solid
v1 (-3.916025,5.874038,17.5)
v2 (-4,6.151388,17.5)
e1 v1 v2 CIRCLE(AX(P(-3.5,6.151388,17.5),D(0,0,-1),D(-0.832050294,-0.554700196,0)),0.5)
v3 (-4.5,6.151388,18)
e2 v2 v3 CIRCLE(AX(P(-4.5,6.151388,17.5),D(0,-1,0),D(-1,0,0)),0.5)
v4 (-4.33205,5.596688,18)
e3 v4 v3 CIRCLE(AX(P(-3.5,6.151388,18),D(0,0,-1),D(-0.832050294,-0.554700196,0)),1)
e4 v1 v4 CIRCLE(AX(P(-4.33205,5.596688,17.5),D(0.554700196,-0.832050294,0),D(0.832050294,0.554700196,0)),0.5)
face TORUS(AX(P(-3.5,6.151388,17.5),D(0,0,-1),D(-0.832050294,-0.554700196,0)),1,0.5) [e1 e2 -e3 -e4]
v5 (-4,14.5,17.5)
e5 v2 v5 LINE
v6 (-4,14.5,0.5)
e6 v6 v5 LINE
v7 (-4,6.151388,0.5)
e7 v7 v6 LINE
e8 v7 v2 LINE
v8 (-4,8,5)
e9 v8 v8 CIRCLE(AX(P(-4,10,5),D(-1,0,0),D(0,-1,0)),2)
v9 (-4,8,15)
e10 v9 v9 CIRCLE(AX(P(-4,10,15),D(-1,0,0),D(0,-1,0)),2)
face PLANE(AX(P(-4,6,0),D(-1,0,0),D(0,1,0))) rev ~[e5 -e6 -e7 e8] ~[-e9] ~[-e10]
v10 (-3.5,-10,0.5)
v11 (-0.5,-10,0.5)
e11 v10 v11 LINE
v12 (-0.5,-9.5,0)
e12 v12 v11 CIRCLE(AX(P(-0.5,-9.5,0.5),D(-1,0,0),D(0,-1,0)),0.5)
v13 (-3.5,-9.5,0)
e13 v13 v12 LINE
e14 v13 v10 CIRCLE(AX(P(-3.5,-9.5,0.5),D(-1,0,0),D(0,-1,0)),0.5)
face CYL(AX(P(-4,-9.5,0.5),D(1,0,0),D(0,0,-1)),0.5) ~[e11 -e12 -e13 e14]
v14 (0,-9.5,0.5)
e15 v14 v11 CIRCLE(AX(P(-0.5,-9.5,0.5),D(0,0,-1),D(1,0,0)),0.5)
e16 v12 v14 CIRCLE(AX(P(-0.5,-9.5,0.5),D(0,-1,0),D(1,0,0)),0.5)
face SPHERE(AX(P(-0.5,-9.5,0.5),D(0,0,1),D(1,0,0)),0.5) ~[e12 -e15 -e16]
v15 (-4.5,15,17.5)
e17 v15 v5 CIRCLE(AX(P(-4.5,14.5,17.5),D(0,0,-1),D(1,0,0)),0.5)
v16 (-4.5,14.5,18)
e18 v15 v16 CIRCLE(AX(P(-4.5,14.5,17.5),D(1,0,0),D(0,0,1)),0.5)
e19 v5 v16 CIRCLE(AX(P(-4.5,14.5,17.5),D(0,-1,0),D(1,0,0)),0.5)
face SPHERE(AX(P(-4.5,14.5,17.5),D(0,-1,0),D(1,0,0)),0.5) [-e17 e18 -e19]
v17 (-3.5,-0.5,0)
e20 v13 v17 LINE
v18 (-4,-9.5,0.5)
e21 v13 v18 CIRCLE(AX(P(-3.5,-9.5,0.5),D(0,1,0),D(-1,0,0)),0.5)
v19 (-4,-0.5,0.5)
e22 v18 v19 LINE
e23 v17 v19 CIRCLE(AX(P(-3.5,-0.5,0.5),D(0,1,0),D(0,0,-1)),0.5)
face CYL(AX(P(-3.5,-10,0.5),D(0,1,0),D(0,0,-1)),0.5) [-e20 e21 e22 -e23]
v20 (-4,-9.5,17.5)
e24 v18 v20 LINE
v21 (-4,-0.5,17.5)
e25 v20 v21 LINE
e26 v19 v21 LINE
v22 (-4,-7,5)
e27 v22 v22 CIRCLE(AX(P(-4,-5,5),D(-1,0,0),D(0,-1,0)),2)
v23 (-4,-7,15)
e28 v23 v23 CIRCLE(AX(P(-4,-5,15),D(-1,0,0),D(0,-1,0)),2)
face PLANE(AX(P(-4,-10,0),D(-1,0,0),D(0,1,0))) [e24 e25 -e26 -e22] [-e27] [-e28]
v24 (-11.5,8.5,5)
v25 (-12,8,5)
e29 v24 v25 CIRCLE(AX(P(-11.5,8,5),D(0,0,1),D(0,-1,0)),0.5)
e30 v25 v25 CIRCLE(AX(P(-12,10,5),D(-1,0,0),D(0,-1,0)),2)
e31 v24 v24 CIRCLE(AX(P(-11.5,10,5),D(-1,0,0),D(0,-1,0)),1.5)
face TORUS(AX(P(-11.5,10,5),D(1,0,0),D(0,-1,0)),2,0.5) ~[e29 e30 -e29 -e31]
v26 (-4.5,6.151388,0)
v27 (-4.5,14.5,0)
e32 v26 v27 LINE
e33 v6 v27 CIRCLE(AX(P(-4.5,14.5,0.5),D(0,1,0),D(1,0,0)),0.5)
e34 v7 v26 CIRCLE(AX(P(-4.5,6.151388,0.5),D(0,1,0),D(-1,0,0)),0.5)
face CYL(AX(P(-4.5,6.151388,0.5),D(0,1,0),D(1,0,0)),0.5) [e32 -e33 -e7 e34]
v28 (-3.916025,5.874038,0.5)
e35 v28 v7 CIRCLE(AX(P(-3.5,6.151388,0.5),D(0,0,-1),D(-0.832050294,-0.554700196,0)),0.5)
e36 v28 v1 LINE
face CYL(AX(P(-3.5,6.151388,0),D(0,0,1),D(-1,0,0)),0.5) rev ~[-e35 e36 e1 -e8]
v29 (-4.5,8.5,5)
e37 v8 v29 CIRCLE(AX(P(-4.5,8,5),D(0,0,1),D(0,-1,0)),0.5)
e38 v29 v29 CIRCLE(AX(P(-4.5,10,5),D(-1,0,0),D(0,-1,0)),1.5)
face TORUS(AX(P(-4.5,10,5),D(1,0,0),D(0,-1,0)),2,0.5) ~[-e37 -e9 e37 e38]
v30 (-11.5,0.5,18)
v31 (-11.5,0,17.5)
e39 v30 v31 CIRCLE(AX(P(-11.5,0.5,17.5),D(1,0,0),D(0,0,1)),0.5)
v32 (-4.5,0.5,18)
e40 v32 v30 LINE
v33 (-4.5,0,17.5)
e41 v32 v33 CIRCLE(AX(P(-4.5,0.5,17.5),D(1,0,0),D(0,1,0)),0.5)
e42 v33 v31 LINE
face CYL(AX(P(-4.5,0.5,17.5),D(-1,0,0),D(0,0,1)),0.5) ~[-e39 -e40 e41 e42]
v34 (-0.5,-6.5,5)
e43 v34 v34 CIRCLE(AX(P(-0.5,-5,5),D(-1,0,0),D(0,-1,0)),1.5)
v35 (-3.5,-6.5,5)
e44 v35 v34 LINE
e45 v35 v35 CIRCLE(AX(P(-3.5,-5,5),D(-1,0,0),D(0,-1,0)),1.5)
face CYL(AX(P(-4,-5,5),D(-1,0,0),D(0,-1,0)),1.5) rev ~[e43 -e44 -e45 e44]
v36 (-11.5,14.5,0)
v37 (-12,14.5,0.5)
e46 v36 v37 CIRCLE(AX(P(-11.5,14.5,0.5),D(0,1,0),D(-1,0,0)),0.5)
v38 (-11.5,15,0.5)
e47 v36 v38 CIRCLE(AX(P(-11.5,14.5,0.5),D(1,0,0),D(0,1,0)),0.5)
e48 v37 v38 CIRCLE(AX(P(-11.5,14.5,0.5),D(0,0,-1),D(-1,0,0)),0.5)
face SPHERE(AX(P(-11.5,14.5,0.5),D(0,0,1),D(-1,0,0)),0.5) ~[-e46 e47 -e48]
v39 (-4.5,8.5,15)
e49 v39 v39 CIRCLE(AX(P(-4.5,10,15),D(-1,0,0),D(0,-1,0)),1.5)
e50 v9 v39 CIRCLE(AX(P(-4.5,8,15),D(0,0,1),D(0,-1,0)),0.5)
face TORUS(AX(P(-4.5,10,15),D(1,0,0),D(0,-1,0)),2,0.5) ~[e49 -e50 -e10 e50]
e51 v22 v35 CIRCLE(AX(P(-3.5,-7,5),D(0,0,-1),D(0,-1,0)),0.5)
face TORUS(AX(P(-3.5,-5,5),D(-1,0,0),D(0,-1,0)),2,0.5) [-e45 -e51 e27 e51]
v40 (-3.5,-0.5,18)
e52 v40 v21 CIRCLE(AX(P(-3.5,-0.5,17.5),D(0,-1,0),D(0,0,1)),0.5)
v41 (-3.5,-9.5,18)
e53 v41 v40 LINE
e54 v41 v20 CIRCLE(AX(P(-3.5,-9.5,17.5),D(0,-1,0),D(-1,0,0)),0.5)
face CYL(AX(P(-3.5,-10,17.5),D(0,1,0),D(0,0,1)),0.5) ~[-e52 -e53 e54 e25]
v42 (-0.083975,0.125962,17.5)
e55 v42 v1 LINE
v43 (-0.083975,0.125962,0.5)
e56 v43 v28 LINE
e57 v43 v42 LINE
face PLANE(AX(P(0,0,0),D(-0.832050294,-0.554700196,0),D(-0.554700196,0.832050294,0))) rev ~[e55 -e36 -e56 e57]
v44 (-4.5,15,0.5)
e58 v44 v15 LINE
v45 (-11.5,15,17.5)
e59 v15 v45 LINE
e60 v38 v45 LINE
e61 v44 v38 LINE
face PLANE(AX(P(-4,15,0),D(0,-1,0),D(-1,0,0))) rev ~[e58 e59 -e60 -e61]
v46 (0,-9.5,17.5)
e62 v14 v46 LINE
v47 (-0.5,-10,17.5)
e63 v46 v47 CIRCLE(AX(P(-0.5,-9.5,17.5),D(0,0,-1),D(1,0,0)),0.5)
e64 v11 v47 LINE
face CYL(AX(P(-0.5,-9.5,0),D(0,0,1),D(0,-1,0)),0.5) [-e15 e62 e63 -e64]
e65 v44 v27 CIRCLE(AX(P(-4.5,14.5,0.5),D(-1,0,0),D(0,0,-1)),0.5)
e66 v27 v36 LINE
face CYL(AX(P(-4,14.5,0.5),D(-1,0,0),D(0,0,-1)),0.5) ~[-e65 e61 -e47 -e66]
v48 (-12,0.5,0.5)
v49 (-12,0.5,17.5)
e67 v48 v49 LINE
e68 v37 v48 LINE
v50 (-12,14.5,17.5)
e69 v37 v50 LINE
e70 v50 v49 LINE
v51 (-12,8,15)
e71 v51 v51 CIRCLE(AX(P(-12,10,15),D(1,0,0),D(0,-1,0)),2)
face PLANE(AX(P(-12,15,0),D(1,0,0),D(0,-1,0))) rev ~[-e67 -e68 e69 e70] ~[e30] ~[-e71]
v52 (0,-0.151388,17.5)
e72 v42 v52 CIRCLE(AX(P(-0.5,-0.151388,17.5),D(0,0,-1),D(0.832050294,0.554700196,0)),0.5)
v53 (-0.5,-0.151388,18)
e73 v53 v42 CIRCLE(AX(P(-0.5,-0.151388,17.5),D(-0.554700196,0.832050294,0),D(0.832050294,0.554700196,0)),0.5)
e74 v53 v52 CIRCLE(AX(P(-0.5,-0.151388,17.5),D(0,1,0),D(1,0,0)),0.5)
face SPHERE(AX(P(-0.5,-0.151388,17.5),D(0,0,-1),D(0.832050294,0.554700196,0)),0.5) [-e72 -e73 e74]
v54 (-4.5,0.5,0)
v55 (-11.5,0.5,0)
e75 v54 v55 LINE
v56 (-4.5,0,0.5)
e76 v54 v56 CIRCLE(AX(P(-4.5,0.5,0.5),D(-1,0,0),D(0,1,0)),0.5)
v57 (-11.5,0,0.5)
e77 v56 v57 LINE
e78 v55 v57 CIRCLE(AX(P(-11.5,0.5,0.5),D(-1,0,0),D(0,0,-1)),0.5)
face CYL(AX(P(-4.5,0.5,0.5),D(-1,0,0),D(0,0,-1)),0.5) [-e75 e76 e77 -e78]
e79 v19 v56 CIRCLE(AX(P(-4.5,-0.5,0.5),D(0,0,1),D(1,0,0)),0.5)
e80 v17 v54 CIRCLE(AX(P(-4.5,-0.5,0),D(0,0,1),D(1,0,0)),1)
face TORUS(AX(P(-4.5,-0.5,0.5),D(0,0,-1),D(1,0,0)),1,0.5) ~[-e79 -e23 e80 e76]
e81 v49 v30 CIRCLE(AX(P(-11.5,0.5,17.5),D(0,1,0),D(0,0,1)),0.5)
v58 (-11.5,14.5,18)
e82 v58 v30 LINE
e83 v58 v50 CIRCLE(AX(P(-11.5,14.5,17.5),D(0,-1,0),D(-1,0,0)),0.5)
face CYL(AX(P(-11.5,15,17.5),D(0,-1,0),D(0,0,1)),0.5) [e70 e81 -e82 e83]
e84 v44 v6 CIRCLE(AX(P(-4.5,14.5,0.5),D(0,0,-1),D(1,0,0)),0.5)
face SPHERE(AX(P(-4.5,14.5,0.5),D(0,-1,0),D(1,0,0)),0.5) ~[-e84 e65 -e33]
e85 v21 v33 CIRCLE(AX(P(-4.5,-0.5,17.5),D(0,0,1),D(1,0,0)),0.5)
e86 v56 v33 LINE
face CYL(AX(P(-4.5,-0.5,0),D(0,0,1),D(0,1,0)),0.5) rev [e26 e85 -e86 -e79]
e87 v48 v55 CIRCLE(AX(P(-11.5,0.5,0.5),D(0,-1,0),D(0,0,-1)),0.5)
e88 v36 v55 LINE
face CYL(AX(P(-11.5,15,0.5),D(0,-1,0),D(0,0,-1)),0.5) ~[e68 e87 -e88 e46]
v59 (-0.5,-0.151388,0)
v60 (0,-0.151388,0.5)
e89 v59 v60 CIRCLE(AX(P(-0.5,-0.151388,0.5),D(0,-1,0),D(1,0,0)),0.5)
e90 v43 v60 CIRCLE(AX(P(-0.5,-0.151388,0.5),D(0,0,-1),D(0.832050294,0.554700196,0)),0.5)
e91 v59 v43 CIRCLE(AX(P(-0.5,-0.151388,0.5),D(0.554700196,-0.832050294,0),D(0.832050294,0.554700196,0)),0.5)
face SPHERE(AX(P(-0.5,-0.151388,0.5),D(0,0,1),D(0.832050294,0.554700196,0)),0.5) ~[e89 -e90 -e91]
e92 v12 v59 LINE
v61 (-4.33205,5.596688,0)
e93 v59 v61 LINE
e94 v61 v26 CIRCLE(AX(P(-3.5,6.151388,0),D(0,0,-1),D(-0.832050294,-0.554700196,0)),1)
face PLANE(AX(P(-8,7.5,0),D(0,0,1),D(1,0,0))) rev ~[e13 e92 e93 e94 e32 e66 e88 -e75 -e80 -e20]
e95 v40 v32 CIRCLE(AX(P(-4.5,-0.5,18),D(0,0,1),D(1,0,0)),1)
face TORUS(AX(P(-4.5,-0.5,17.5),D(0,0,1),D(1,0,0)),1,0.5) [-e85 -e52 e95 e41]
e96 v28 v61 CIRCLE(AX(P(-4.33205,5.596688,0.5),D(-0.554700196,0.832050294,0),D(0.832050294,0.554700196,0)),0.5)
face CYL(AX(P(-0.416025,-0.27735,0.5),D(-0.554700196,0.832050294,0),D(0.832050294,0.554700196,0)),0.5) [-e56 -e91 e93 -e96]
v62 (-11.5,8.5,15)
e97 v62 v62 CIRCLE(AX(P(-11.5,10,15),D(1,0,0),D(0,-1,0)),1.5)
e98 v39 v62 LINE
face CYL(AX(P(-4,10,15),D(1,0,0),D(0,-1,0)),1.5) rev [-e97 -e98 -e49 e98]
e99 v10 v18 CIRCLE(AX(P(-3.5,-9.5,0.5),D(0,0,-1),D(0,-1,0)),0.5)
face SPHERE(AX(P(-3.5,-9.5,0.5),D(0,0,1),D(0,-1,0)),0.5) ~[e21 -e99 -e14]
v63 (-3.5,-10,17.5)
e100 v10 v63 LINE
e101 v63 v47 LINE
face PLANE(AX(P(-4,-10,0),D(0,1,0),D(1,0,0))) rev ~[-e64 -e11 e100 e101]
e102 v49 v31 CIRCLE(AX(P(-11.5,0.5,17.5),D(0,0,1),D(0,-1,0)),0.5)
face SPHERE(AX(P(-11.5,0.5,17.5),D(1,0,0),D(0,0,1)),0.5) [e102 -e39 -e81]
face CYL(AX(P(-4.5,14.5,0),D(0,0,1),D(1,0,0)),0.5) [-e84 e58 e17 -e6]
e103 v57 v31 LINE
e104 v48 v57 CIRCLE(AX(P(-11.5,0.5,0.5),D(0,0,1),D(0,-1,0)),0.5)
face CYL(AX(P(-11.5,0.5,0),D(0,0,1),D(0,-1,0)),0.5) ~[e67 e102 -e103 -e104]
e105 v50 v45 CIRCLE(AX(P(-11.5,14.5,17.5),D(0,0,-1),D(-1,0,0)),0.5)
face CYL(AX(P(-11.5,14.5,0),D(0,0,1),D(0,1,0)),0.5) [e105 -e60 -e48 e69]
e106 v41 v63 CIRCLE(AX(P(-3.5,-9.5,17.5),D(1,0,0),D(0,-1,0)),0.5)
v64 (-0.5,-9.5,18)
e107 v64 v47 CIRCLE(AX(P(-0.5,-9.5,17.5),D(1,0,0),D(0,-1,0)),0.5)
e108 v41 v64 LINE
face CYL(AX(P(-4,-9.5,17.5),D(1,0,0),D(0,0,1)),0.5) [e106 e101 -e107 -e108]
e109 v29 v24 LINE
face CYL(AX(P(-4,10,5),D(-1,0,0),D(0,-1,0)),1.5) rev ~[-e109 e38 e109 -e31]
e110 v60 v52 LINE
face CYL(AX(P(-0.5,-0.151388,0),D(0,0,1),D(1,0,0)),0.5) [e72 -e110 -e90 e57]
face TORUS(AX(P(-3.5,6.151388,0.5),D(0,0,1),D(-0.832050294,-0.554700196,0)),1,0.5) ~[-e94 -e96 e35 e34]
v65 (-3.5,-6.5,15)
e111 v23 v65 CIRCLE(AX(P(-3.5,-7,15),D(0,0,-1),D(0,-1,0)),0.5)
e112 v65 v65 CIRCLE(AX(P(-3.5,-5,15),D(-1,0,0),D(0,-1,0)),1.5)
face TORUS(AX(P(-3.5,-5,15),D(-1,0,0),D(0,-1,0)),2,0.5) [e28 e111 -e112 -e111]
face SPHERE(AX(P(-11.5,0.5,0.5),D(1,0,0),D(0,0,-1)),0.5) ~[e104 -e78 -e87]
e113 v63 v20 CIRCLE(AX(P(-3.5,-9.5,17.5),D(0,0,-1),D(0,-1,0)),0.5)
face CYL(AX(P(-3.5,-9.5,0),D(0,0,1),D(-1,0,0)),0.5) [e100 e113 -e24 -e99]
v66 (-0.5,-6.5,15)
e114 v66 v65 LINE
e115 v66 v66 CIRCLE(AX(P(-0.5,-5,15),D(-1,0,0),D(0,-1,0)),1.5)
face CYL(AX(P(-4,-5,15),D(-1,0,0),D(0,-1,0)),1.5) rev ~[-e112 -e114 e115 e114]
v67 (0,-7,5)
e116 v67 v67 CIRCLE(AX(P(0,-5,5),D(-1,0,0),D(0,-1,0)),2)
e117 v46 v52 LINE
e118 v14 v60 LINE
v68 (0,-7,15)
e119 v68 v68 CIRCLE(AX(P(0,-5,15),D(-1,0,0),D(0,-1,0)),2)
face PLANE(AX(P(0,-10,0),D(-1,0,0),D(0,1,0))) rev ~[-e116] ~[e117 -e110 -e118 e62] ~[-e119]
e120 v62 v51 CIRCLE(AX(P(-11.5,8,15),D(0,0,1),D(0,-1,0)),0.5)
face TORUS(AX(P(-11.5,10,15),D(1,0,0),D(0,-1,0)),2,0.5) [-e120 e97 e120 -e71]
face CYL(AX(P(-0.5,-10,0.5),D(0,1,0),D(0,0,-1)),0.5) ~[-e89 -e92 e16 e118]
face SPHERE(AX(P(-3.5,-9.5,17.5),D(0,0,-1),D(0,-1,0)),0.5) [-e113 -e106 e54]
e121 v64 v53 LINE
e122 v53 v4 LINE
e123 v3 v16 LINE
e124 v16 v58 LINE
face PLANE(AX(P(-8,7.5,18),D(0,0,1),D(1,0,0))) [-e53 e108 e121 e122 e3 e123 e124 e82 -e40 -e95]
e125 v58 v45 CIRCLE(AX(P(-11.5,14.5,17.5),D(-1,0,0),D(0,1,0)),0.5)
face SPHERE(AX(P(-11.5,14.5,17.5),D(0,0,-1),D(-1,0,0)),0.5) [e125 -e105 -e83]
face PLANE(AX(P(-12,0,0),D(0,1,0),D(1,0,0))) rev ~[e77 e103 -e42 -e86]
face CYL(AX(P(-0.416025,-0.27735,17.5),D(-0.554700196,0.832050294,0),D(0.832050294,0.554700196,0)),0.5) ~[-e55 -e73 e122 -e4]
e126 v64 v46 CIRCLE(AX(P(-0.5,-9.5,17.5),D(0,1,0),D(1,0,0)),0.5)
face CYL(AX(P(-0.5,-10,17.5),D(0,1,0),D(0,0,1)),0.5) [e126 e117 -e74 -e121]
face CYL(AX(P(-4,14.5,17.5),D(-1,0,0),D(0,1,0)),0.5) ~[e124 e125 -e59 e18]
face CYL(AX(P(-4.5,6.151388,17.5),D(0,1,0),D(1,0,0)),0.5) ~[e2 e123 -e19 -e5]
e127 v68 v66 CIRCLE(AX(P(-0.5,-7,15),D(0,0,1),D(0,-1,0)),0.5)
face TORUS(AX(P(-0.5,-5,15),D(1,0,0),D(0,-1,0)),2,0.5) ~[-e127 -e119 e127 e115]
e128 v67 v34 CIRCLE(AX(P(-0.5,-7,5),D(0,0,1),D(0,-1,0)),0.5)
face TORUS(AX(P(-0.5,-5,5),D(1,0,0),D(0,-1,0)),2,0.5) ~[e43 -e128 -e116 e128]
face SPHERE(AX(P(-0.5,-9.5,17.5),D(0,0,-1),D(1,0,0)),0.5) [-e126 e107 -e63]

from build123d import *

# Parameters (mm, degrees)
F0_W     = 4
F0_H     = 10
F1_DEPTH = 18
F2_R     = 1.5
F3_DEPTH = 10
F4_DEPTH = 10
F5_F1_R  = 0.5
F5_F2_R  = 0.5


with BuildPart() as f1:
    # F0 (on Top) → F1 (new body)
    with BuildSketch(Plane.XY):
        Polygon((-4, 15), (-12, 15), (-12, 0), (-4, 0), (-4, 6), align=None)
        Polygon((0, 0), (-4, 6), (-4, 0), align=None)
        with Locations((-2, -5)):
            Rectangle(F0_W, F0_H)
    extrude(amount=F1_DEPTH)

    # F2 (on face) → F3 (cut, symmetric)
    with BuildSketch(Plane(origin=(-4, 0, 0), x_dir=(0, -1, 0), z_dir=(-1, 0, 0))):
        with Locations((5, 5)):
            Circle(F2_R)
        with Locations((5, 15)):
            Circle(F2_R)
    extrude(amount=F3_DEPTH, both=True, mode=Mode.SUBTRACT)

    # F2 (on face) → F4 (cut, symmetric)
    with BuildSketch(Plane(origin=(-4, 0, 0), x_dir=(0, -1, 0), z_dir=(-1, 0, 0))):
        with Locations((-10, 15)):
            Circle(F2_R)
        with Locations((-10, 5)):
            Circle(F2_R)
    extrude(amount=F4_DEPTH, both=True, mode=Mode.SUBTRACT)

    # F5: fillet of radius 0.5 on 28 edges, made by hand

    # F5_f1
    f5_f1_edges = [f1.edges().sort_by_distance(p)[0] for p in [
        (-4, 6, 9),
        (-4, 0, 9),
    ]]
    fillet(f5_f1_edges, radius=F5_F1_R)

    # F5_f2
    f5_f2_edges = [f1.edges().sort_by_distance(p)[0] for p in [
        (-4, 10.5756939094, 0),
        (-4, 10.5756939094, 18),
        (-4, 15, 9),
        (-4, 11.5, 15),
        (-4, 11.5, 5),
        (0, -10, 9),
        (0, -5, 0),
        (0, -5, 18),
        (0, 0, 9),
        (0, -3.5, 15),
        (0, -3.5, 5),
        (-4, -10, 9),
        (-2, -10, 0),
        (-2, -10, 18),
        (-4, -5.25, 0),
        (-4, -5.25, 18),
        (-4, -3.5, 15),
        (-4, -3.5, 5),
        (-12, 15, 9),
        (-12, 7.5, 0),
        (-12, 7.5, 18),
        (-12, 0, 9),
        (-12, 11.5, 15),
        (-12, 11.5, 5),
        (-8, 15, 0),
        (-8, 15, 18),
        (-4.1464466094, -0.1464466094, 18),
        (-4.1464466094, -0.1464466094, 0),
        (-3.9785460132, 6.0064957445, 18),
        (-3.9785460132, 6.0064957445, 0),
    ]]
    fillet(f5_f2_edges, radius=F5_F2_R)


solid = f1.part
